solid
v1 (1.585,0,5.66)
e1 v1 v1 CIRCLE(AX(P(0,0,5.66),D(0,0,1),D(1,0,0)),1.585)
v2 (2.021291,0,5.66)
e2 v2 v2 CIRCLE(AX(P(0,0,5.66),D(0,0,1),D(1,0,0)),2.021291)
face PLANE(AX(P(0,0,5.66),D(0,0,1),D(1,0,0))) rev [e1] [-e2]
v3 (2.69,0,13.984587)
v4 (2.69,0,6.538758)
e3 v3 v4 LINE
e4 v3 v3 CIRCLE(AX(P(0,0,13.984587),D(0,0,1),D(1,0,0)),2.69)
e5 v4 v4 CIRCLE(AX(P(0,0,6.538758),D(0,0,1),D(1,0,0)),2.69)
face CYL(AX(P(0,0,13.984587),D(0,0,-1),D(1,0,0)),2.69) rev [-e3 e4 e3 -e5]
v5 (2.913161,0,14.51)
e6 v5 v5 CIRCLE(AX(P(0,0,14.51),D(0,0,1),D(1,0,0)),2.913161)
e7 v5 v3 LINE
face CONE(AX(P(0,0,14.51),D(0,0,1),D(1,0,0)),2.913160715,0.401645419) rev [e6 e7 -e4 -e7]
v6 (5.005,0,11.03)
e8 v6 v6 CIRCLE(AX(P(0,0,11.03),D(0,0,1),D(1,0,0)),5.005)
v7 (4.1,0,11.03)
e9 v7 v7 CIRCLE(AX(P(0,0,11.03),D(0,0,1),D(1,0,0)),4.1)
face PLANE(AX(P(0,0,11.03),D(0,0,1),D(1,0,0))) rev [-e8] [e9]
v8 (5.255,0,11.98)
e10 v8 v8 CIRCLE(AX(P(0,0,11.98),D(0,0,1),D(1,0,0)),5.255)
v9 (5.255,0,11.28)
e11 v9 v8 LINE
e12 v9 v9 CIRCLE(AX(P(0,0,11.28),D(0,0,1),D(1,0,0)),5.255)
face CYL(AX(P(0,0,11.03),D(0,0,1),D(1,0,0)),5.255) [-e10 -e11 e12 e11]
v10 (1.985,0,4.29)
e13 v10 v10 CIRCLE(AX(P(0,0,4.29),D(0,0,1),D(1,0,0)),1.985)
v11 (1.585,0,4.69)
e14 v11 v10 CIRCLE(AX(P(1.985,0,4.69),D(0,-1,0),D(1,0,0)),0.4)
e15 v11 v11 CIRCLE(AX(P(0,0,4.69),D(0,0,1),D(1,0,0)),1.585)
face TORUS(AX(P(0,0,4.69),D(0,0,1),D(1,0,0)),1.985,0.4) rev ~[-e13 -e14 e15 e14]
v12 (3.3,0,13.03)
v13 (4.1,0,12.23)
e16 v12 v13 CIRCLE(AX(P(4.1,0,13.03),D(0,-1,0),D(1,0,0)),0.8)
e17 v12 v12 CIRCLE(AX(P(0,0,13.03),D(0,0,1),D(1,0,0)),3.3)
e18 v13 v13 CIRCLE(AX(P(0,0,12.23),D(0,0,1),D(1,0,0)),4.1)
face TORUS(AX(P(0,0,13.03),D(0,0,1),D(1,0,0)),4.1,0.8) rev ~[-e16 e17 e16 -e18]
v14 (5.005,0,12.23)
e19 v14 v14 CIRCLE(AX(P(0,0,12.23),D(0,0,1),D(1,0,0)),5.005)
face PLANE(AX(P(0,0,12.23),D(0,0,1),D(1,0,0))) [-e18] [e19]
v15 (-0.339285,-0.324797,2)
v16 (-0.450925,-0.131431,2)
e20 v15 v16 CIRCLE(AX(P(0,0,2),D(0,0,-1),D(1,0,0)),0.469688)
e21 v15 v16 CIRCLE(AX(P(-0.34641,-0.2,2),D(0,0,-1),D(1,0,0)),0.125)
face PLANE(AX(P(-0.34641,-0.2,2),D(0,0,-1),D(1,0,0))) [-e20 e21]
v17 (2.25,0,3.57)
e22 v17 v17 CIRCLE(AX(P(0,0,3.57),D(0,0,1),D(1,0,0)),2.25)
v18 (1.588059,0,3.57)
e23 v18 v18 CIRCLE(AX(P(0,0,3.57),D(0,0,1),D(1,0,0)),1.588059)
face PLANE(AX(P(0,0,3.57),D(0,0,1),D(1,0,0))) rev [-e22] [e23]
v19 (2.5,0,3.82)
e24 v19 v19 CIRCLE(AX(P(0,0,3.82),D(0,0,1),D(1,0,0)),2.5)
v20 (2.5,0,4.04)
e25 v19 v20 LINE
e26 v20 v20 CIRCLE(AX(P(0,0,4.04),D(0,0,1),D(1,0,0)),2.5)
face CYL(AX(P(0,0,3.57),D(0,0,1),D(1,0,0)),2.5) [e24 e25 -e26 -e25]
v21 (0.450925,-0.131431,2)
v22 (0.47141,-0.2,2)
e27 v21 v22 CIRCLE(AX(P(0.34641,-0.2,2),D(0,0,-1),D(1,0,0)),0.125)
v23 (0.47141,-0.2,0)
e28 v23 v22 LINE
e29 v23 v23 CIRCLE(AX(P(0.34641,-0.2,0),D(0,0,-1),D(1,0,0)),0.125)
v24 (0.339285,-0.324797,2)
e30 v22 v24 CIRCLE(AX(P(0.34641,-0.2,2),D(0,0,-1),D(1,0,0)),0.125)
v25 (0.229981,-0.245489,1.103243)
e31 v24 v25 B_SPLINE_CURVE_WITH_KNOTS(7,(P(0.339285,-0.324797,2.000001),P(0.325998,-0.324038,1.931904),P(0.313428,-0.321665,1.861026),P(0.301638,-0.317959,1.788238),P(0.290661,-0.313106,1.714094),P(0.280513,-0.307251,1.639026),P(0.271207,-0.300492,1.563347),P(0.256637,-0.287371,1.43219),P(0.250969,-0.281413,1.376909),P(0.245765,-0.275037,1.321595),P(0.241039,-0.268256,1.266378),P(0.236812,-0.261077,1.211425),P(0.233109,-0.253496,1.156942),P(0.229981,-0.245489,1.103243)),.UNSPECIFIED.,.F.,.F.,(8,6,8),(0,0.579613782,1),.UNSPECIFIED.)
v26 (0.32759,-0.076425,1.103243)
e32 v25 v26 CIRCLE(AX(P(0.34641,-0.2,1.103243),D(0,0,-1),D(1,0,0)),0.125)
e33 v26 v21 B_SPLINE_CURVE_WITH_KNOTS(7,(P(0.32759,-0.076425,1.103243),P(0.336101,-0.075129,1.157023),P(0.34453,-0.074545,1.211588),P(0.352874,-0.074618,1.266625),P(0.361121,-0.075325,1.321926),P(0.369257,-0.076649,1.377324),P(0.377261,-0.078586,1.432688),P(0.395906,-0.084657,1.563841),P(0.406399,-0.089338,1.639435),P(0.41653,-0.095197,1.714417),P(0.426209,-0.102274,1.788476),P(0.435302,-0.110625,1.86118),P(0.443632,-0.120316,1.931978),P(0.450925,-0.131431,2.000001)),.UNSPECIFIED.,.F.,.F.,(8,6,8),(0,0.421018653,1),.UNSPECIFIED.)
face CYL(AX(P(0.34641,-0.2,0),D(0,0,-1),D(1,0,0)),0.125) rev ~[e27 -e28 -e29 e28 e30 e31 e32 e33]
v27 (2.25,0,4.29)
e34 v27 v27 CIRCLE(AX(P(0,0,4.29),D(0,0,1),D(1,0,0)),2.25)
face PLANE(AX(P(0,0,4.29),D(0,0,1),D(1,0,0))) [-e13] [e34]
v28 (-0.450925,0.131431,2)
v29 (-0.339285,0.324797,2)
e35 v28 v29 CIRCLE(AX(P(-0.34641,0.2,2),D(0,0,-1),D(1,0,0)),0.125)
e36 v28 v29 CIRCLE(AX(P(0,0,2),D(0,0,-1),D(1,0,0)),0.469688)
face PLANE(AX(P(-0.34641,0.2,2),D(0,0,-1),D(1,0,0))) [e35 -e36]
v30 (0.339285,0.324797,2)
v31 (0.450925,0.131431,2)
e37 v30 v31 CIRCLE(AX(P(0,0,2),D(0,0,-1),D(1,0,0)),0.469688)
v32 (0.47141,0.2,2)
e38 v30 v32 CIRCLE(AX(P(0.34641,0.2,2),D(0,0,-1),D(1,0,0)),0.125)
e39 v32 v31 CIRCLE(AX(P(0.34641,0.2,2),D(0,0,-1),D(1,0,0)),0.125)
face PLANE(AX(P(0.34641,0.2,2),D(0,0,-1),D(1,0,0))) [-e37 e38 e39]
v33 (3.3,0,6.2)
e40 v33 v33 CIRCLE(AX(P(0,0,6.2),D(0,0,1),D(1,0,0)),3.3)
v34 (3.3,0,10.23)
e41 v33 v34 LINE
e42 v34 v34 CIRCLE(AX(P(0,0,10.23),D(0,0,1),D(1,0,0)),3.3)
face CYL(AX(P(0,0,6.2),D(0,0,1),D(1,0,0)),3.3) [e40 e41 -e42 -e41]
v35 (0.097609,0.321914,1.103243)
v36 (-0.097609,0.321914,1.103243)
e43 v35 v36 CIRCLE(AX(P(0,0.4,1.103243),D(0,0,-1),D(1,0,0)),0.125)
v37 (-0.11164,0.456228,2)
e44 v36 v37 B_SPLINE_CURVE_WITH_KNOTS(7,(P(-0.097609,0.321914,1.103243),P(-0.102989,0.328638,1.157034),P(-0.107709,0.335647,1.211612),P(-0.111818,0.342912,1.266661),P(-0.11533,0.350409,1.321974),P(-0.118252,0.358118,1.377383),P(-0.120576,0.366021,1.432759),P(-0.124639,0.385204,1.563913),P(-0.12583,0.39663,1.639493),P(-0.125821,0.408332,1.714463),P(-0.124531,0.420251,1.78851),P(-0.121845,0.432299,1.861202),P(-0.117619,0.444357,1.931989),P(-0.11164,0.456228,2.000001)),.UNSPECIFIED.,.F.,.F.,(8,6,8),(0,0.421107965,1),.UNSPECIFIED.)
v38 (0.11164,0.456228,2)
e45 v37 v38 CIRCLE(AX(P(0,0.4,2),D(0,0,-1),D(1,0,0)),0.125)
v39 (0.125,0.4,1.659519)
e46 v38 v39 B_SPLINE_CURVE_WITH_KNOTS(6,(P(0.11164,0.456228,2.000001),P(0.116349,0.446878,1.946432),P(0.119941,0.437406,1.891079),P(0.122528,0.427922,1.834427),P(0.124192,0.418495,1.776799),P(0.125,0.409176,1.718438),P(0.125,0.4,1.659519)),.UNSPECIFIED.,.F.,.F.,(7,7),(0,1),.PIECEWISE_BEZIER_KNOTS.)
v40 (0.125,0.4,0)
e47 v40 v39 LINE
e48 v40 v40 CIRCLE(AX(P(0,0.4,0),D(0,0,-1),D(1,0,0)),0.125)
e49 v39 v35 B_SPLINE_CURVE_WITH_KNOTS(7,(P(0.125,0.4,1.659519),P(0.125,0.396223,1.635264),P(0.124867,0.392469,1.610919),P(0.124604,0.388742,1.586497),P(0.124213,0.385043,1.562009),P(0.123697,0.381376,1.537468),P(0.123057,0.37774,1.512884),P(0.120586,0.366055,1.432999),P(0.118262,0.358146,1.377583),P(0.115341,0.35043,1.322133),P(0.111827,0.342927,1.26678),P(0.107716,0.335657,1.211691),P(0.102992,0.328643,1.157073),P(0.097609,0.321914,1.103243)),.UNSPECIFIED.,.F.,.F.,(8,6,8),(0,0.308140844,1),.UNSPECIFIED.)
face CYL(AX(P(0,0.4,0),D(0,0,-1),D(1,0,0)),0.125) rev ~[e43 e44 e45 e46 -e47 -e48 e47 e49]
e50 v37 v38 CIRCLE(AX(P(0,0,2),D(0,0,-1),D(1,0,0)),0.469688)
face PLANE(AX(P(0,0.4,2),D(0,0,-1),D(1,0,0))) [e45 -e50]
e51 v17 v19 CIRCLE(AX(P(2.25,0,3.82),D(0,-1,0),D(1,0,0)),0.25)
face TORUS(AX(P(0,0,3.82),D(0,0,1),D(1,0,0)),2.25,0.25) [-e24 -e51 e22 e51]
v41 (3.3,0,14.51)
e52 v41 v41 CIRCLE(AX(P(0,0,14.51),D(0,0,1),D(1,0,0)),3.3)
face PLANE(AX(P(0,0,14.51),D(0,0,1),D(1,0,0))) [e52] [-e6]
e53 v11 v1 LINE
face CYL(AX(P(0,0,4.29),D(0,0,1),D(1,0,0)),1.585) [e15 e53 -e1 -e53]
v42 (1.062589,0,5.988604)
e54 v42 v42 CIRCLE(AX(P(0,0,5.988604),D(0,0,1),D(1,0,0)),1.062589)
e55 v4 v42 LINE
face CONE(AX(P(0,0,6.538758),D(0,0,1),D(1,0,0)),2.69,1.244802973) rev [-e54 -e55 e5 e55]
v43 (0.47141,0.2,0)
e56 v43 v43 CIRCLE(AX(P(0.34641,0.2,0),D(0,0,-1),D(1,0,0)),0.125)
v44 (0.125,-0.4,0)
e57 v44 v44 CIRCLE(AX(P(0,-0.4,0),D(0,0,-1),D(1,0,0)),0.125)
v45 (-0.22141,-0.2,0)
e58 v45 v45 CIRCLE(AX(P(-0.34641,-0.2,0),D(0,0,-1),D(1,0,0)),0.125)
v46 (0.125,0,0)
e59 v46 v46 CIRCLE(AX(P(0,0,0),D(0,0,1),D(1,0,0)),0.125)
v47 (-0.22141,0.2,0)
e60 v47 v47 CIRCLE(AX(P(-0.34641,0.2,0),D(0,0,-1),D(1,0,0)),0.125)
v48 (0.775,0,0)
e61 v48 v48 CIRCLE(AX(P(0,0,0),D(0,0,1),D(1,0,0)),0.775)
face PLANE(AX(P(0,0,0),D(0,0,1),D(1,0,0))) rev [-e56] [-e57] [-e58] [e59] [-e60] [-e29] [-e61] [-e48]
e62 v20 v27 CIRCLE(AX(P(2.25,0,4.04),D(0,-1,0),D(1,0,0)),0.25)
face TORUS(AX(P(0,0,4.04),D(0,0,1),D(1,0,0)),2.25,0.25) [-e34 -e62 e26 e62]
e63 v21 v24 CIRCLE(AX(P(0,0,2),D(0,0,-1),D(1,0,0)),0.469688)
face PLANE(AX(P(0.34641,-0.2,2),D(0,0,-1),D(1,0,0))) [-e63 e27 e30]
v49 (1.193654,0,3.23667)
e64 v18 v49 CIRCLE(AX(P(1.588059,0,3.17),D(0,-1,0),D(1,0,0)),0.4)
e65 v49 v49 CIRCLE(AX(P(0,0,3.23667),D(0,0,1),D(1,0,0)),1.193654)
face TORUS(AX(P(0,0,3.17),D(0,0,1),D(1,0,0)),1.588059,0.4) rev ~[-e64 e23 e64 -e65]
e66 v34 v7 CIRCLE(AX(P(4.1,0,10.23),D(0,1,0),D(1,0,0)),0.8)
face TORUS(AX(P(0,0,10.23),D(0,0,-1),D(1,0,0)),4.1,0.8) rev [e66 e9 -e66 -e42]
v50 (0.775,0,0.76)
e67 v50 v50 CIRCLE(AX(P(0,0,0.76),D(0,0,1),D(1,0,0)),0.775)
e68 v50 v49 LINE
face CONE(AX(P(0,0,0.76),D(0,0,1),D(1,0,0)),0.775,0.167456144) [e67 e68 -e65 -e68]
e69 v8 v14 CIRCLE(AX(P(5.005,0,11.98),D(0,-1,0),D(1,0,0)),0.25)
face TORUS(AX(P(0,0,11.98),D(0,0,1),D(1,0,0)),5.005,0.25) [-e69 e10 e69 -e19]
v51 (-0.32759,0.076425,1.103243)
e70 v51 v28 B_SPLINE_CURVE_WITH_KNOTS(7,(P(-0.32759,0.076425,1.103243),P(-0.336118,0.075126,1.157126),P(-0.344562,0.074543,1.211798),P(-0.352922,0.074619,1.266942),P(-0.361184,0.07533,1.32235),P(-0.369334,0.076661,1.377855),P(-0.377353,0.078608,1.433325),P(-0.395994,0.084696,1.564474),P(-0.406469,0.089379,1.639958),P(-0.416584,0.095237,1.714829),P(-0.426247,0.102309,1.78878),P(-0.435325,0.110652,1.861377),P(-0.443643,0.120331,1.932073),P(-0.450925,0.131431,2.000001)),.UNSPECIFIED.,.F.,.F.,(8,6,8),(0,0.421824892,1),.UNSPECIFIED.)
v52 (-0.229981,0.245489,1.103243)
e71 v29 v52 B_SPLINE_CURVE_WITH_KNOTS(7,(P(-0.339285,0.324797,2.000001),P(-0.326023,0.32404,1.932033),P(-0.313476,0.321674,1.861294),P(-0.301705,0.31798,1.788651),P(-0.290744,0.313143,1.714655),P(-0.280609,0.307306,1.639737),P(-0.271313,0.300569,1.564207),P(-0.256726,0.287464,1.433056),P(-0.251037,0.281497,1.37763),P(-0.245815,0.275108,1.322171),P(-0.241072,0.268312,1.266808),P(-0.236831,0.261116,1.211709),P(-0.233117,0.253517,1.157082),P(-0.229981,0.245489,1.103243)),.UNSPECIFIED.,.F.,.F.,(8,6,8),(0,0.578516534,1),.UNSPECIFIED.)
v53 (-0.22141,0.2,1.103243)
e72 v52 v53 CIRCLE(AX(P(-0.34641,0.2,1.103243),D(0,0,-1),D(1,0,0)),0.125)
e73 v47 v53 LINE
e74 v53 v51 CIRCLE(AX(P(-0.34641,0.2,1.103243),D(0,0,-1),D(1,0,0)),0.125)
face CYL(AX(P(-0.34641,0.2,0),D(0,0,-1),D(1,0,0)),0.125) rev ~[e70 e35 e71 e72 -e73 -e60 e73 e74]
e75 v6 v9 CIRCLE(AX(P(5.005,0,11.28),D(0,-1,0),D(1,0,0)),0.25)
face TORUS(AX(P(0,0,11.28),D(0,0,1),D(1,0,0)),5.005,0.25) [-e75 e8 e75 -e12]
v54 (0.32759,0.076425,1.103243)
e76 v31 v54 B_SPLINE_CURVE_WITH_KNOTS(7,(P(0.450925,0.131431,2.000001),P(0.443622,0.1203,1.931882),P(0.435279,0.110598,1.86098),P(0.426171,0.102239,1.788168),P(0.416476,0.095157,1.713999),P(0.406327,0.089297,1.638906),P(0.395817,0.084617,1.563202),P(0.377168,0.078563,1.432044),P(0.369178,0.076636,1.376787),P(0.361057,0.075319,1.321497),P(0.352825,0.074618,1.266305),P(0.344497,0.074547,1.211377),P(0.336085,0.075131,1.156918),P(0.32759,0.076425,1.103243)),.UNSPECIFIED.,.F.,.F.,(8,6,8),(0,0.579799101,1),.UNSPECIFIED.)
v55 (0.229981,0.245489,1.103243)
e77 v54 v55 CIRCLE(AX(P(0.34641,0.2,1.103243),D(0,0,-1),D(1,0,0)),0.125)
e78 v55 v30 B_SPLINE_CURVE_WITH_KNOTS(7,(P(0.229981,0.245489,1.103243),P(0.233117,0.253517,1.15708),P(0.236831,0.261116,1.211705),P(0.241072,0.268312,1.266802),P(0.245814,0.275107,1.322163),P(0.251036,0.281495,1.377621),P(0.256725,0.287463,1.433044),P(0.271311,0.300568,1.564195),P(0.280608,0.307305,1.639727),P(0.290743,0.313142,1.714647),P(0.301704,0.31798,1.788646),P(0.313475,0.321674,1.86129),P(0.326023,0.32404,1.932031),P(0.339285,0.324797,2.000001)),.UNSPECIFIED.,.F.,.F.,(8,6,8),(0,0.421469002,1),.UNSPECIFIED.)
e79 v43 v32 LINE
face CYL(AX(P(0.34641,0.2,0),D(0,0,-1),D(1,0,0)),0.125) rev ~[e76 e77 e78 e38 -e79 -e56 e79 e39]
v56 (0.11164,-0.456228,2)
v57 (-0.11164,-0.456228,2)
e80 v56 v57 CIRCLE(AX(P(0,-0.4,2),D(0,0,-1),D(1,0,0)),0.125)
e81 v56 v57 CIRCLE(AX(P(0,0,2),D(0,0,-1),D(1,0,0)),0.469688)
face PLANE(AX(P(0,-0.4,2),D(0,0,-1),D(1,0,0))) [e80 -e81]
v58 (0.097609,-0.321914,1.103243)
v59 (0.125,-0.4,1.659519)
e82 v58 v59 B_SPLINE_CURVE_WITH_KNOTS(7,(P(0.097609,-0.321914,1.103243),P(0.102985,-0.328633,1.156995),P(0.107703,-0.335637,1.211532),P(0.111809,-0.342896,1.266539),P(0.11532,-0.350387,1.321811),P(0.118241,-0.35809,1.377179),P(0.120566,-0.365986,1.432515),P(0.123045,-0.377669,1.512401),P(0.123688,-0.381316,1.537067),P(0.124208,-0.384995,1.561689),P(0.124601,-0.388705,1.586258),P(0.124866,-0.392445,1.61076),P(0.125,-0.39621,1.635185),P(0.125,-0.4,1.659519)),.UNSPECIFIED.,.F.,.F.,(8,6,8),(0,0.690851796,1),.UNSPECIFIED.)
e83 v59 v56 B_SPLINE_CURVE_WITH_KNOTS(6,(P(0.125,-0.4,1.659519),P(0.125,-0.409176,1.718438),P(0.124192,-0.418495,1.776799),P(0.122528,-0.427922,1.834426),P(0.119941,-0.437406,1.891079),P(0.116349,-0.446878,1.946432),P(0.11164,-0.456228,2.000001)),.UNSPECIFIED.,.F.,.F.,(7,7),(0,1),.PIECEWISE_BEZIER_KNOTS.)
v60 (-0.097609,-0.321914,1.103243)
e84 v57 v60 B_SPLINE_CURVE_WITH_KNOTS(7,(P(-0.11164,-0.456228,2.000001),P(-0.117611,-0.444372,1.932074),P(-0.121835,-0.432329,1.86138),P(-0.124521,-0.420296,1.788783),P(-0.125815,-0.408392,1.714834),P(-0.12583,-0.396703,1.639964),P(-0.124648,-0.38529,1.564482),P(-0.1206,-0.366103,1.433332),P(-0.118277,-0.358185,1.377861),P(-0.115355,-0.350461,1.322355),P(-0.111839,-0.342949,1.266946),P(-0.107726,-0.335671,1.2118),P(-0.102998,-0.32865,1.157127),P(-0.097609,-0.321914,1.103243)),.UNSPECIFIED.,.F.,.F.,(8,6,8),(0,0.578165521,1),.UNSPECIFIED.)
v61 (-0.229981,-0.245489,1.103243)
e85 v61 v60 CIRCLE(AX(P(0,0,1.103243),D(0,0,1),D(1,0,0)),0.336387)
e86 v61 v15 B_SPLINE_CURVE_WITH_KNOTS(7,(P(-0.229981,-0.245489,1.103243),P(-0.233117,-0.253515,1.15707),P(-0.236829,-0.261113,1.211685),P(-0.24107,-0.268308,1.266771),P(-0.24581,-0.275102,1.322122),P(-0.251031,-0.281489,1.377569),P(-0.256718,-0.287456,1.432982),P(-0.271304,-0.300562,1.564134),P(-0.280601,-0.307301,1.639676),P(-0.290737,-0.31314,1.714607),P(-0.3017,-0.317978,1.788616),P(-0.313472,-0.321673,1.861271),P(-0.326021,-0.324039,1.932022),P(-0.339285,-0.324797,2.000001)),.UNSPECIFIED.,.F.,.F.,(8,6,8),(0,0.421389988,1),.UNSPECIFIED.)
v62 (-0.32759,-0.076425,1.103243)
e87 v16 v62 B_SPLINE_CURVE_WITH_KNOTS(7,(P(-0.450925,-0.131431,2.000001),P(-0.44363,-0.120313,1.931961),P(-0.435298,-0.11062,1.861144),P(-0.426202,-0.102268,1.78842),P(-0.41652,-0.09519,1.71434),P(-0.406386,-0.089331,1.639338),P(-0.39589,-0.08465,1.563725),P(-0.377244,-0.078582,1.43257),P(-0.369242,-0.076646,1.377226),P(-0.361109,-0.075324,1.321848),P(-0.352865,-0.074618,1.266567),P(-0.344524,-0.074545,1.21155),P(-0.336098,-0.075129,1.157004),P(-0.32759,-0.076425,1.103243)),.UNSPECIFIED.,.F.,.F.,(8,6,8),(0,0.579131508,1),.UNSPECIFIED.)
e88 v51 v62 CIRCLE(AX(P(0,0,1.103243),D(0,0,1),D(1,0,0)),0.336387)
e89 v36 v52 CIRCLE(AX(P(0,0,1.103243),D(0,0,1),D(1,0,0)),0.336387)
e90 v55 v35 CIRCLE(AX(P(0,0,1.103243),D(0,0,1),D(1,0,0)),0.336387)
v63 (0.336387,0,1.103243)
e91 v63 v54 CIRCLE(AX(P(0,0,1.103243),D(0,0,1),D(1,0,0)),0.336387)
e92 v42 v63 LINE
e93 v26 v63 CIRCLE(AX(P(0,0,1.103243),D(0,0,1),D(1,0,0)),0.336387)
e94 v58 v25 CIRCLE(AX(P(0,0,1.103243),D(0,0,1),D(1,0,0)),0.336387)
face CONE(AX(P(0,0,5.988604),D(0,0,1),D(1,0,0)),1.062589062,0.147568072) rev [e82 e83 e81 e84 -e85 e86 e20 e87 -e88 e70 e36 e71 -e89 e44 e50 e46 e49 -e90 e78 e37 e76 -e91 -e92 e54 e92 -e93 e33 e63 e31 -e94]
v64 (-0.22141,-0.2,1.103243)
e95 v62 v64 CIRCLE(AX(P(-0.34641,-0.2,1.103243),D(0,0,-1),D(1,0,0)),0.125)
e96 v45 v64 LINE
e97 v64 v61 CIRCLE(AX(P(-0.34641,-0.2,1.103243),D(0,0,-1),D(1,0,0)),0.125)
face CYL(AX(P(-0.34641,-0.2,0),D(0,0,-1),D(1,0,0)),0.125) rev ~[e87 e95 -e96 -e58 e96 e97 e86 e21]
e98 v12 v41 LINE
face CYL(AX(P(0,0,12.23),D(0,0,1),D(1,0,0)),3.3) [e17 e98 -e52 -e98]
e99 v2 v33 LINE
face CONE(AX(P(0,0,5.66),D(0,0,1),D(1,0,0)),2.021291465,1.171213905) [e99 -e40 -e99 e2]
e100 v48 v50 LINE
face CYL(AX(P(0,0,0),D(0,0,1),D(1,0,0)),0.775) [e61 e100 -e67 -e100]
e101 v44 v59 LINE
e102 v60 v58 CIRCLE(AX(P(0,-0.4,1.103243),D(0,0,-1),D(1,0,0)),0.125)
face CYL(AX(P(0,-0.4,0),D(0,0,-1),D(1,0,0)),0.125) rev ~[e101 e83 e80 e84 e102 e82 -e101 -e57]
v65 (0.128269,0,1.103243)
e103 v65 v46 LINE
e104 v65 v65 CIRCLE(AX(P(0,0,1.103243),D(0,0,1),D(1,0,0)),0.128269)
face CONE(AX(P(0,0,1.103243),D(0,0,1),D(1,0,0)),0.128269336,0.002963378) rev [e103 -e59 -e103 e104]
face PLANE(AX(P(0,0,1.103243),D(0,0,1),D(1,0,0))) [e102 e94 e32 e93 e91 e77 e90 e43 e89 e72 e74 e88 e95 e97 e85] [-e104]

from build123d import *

# Parameters (mm, degrees)
F2_R     = 0.25
F3_R     = 0.8
F4_R     = 0.4
F5_R     = 0.125
F6_DEPTH = 2


# Not quite as in the source:
# - a feature names something its author has since deleted; it is built from what else it names


with BuildPart() as f1:
    # F0 (on Front) → F1 (revolve)
    with BuildSketch(Plane.XZ):
        Polygon((0.775, 0), (0.775, 0.76), (1.25, 3.57), (2.5, 3.57), (2.5, 4.29), (1.585, 4.29), (1.585, 5.66), (2.0212914647, 5.66), (3.3, 6.2), (3.3, 11.03), (5.255, 11.03), (5.255, 12.23), (3.3, 12.23), (3.3, 14.51), (2.9131607153, 14.51), (2.69, 13.9845872594), (2.69, 6.5387575887), (1.062589062, 5.9886043891), (0.3363867047, 1.1032430921), (0.1282693364, 1.1032430921), (0.125, 0), align=None)
    revolve(axis=Axis((0, 0, 0.6179462071), (0, 0, 1)))

    # F2
    f2_edges = [f1.edges().sort_by_distance(p)[0] for p in [
        (-5.255, 0, 12.23),
        (-5.255, 0, 11.03),
        (-2.5, 0, 4.29),
        (-2.5, 0, 3.57),
    ]]
    fillet(f2_edges, radius=F2_R)

    # F3
    f3_edges = [f1.edges().sort_by_distance(p)[0] for p in [
        (-3.3, 0, 12.23),
        (-3.3, 0, 11.03),
    ]]
    fillet(f3_edges, radius=F3_R)

    # F4
    f4_edges = [f1.edges().sort_by_distance(p)[0] for p in [
        (-1.585, 0, 4.29),
        (-1.25, 0, 3.57),
    ]]
    fillet(f4_edges, radius=F4_R)

    # F5 (on face) → F6 (cut)
    with BuildSketch(Plane(origin=(0, 0, 0), x_dir=(1, 0, 0), z_dir=(0, 0, -1))):
        with Locations((0, 0.4)):
            Circle(F5_R)
        with Locations((-0.3464101615, 0.2)):
            Circle(F5_R)
        with Locations((-0.3464101615, -0.2)):
            Circle(F5_R)
        with Locations((0, -0.4)):
            Circle(F5_R)
        with Locations((0.3464101615, -0.2)):
            Circle(F5_R)
        with Locations((0.3464101615, 0.2)):
            Circle(F5_R)
    extrude(amount=-F6_DEPTH, mode=Mode.SUBTRACT)


solid = f1.part
